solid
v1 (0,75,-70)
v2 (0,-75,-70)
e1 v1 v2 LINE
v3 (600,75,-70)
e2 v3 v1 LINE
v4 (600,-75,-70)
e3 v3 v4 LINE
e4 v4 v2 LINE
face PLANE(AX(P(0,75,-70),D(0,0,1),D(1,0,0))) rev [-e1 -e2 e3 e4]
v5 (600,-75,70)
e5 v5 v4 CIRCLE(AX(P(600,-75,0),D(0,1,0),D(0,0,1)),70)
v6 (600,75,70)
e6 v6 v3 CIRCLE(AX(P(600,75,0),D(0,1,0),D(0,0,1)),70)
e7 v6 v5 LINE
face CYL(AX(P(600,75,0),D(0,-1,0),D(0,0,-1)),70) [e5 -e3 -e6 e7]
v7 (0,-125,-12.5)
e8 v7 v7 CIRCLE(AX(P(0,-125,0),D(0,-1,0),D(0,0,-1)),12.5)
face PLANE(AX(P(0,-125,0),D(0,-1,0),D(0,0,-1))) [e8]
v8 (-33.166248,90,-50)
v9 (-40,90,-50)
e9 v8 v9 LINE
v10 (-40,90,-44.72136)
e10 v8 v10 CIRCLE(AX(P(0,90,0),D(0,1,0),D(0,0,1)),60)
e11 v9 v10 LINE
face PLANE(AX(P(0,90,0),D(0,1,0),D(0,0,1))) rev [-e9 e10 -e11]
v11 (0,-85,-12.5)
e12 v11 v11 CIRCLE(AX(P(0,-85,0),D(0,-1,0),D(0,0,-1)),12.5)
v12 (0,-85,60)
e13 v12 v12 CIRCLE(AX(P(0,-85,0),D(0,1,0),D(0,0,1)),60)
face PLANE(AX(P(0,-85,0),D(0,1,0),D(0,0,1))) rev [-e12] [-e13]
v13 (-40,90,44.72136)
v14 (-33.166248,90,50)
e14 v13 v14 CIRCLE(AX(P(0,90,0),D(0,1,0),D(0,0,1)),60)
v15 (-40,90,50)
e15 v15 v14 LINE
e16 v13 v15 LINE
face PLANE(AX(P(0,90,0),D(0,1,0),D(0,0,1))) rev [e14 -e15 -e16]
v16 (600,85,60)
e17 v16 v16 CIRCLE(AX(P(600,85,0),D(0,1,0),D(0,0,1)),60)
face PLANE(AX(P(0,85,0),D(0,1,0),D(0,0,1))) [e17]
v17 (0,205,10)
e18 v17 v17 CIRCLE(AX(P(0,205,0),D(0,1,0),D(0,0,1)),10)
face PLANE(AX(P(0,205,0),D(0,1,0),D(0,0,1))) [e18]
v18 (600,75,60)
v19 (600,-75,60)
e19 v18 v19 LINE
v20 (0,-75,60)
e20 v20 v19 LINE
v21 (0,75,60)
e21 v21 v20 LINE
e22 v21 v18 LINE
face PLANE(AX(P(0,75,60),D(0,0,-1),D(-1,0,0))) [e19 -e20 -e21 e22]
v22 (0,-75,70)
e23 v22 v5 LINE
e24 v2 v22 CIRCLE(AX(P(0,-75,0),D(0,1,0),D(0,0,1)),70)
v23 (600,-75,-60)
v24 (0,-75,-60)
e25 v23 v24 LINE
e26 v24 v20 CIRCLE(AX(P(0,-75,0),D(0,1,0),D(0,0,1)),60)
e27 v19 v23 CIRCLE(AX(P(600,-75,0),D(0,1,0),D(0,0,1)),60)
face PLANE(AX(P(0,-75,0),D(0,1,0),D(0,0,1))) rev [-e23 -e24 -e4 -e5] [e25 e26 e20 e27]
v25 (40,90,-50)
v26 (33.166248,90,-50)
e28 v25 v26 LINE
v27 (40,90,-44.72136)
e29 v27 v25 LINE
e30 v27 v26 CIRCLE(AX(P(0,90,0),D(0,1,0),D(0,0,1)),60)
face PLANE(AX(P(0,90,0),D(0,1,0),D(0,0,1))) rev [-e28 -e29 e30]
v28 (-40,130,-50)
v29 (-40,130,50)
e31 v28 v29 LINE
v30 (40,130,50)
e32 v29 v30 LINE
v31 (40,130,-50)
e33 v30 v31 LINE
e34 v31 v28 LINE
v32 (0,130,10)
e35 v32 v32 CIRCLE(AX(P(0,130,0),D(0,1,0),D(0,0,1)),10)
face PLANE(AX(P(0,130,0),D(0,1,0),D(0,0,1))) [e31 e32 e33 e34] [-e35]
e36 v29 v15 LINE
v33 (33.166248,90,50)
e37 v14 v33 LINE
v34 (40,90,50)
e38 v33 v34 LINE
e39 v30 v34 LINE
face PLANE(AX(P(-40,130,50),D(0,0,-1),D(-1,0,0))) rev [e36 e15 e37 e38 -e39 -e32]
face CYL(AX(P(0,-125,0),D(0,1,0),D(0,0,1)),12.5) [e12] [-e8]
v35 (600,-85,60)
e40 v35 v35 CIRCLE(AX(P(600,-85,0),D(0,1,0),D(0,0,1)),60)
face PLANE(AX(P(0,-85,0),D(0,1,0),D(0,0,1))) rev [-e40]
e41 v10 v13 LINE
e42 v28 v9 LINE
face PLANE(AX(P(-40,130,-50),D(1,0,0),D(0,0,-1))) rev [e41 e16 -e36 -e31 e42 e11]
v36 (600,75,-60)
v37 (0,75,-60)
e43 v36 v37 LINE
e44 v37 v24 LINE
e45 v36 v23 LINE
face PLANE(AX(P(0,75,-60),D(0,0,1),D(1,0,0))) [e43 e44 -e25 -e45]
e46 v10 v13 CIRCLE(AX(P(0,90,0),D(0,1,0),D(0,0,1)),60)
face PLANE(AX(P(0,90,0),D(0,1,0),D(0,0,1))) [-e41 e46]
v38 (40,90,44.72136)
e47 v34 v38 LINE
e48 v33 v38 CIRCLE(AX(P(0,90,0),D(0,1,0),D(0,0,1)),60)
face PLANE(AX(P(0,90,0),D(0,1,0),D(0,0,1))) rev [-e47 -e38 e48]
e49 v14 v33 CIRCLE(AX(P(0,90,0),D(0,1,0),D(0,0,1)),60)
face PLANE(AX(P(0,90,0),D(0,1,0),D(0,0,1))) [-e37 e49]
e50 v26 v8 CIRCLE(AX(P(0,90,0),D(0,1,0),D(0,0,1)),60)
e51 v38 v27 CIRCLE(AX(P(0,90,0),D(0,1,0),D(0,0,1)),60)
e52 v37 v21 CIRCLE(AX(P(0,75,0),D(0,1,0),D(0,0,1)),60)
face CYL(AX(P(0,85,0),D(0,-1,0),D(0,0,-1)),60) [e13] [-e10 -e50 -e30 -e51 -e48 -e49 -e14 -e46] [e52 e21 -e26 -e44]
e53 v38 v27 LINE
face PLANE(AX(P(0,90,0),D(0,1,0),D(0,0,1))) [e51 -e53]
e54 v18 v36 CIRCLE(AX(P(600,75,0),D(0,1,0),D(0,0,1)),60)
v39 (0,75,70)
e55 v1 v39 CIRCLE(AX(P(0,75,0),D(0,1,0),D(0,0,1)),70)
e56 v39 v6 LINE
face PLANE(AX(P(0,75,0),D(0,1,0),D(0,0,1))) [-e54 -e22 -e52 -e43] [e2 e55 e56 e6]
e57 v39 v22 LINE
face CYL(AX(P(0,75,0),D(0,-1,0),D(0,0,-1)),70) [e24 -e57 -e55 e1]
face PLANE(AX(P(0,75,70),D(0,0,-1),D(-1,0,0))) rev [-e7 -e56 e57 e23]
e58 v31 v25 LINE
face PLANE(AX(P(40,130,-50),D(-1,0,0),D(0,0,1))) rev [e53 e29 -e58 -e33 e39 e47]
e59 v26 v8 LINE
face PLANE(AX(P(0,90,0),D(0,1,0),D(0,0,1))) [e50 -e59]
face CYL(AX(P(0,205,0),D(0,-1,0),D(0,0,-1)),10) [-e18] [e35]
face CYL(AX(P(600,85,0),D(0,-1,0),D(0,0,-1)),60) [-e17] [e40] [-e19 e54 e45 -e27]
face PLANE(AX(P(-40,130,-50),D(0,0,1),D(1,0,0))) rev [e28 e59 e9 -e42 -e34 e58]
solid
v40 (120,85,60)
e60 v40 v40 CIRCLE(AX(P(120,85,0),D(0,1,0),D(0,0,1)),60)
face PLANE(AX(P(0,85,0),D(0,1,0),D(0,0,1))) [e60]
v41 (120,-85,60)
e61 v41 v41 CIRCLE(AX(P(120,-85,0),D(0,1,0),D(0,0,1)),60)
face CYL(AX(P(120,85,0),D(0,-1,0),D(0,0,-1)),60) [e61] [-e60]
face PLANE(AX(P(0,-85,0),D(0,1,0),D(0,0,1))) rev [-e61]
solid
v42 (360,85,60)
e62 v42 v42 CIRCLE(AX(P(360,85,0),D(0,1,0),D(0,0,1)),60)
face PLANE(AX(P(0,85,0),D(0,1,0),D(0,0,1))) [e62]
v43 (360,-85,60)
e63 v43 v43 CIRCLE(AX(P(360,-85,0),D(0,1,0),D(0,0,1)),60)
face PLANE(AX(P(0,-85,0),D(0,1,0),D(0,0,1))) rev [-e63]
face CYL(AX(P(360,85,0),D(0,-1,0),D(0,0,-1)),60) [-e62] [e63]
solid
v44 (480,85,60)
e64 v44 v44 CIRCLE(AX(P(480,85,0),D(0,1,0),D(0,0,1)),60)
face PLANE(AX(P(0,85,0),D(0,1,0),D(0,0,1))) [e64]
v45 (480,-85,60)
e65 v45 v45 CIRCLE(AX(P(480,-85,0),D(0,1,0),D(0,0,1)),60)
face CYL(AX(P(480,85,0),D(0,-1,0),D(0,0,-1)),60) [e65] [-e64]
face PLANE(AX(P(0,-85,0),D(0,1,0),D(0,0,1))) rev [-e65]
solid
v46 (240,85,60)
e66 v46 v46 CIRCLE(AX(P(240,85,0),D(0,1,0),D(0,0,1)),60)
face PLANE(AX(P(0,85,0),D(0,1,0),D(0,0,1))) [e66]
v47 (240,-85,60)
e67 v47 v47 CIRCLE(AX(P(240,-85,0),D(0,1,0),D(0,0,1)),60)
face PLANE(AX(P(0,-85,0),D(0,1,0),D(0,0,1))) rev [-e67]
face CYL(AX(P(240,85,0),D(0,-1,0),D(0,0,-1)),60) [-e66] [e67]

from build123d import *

# Parameters (mm, degrees)
BOSS_EXTRUDE1_DEPTH = 75
SKETCH3_R           = 60
BOSS_EXTRUDE2_DEPTH = 85
SKETCH4_R           = 12.5
BOSS_EXTRUDE3_DEPTH = 40
SKETCH5_R           = 10
BOSS_EXTRUDE4_DEPTH = 120
BOSS_EXTRUDE7_START = 5
SKETCH6_R           = 60
BOSS_EXTRUDE7_DEPTH = 5
SKETCH7_W           = 80
SKETCH7_H           = 100
SKETCH7_R           = 10
BOSS_EXTRUDE8_DEPTH = 40


with BuildPart() as part:
    # Sketch1 → Boss-Extrude1 (new, symmetric)
    with BuildSketch(Plane(origin=(0, 0, 0), x_dir=(1, 0, 0), z_dir=(0, 1, 0))):
        with BuildLine():
            Line((0, 70), (600, 70))
            ThreePointArc((600, 70), (670, 0), (600, -70))
            Line((600, -70), (0, -70))
            ThreePointArc((0, -70), (-70, 0), (0, 70))
        make_face()
        with BuildLine():
            Line((0, 60), (600, 60))
            ThreePointArc((600, 60), (660, 0), (600, -60))
            Line((600, -60), (0, -60))
            ThreePointArc((0, -60), (-60, 0), (0, 60))
        make_face(mode=Mode.SUBTRACT)
    extrude(amount=BOSS_EXTRUDE1_DEPTH, both=True)

    # Sketch3 → Boss-Extrude2 (add, symmetric)
    with BuildSketch(Plane(origin=(0, 0, 0), x_dir=(1, 0, 0), z_dir=(0, 1, 0))):
        Circle(SKETCH3_R)
        with Locations((600, 0)):
            Circle(SKETCH3_R)
        with BuildLine():
            ThreePointArc((540, 0), (480, 60), (420, 0))
            ThreePointArc((420, 0), (480, -60), (540, 0))
        make_face()
        with BuildLine():
            ThreePointArc((420, 0), (360, 60), (300, 0))
            ThreePointArc((300, 0), (360, -60), (420, 0))
        make_face()
        with BuildLine():
            ThreePointArc((300, 0), (240, 60), (180, 0))
            ThreePointArc((180, 0), (240, -60), (300, 0))
        make_face()
        with BuildLine():
            ThreePointArc((180, 0), (120, 60), (60, 0))
            ThreePointArc((60, 0), (120, -60), (180, 0))
        make_face()
    extrude(amount=BOSS_EXTRUDE2_DEPTH, both=True)

    # Sketch4 → Boss-Extrude3 (add)
    with BuildSketch(Plane.XZ.offset(85)):
        Circle(SKETCH4_R)
    extrude(amount=BOSS_EXTRUDE3_DEPTH)

    # Sketch5 → Boss-Extrude4 (add)
    with BuildSketch(Plane(origin=(0, 85, 0), x_dir=(1, 0, 0), z_dir=(0, 1, 0))):
        Circle(SKETCH5_R)
    extrude(amount=BOSS_EXTRUDE4_DEPTH)

    # Sketch6 → Boss-Extrude7 (add)
    with BuildSketch(Plane(origin=(0, 85, 0), x_dir=(1, 0, 0), z_dir=(0, 1, 0)).offset(BOSS_EXTRUDE7_START)):
        Circle(SKETCH6_R)
    extrude(amount=-BOSS_EXTRUDE7_DEPTH)

    # Sketch7 → Boss-Extrude8 (add)
    with BuildSketch(Plane(origin=(0, 90, 0), x_dir=(1, 0, 0), z_dir=(0, 1, 0))):
        Rectangle(SKETCH7_W, SKETCH7_H)
        Circle(SKETCH7_R, mode=Mode.SUBTRACT)
    extrude(amount=BOSS_EXTRUDE8_DEPTH)


solid = part.part
